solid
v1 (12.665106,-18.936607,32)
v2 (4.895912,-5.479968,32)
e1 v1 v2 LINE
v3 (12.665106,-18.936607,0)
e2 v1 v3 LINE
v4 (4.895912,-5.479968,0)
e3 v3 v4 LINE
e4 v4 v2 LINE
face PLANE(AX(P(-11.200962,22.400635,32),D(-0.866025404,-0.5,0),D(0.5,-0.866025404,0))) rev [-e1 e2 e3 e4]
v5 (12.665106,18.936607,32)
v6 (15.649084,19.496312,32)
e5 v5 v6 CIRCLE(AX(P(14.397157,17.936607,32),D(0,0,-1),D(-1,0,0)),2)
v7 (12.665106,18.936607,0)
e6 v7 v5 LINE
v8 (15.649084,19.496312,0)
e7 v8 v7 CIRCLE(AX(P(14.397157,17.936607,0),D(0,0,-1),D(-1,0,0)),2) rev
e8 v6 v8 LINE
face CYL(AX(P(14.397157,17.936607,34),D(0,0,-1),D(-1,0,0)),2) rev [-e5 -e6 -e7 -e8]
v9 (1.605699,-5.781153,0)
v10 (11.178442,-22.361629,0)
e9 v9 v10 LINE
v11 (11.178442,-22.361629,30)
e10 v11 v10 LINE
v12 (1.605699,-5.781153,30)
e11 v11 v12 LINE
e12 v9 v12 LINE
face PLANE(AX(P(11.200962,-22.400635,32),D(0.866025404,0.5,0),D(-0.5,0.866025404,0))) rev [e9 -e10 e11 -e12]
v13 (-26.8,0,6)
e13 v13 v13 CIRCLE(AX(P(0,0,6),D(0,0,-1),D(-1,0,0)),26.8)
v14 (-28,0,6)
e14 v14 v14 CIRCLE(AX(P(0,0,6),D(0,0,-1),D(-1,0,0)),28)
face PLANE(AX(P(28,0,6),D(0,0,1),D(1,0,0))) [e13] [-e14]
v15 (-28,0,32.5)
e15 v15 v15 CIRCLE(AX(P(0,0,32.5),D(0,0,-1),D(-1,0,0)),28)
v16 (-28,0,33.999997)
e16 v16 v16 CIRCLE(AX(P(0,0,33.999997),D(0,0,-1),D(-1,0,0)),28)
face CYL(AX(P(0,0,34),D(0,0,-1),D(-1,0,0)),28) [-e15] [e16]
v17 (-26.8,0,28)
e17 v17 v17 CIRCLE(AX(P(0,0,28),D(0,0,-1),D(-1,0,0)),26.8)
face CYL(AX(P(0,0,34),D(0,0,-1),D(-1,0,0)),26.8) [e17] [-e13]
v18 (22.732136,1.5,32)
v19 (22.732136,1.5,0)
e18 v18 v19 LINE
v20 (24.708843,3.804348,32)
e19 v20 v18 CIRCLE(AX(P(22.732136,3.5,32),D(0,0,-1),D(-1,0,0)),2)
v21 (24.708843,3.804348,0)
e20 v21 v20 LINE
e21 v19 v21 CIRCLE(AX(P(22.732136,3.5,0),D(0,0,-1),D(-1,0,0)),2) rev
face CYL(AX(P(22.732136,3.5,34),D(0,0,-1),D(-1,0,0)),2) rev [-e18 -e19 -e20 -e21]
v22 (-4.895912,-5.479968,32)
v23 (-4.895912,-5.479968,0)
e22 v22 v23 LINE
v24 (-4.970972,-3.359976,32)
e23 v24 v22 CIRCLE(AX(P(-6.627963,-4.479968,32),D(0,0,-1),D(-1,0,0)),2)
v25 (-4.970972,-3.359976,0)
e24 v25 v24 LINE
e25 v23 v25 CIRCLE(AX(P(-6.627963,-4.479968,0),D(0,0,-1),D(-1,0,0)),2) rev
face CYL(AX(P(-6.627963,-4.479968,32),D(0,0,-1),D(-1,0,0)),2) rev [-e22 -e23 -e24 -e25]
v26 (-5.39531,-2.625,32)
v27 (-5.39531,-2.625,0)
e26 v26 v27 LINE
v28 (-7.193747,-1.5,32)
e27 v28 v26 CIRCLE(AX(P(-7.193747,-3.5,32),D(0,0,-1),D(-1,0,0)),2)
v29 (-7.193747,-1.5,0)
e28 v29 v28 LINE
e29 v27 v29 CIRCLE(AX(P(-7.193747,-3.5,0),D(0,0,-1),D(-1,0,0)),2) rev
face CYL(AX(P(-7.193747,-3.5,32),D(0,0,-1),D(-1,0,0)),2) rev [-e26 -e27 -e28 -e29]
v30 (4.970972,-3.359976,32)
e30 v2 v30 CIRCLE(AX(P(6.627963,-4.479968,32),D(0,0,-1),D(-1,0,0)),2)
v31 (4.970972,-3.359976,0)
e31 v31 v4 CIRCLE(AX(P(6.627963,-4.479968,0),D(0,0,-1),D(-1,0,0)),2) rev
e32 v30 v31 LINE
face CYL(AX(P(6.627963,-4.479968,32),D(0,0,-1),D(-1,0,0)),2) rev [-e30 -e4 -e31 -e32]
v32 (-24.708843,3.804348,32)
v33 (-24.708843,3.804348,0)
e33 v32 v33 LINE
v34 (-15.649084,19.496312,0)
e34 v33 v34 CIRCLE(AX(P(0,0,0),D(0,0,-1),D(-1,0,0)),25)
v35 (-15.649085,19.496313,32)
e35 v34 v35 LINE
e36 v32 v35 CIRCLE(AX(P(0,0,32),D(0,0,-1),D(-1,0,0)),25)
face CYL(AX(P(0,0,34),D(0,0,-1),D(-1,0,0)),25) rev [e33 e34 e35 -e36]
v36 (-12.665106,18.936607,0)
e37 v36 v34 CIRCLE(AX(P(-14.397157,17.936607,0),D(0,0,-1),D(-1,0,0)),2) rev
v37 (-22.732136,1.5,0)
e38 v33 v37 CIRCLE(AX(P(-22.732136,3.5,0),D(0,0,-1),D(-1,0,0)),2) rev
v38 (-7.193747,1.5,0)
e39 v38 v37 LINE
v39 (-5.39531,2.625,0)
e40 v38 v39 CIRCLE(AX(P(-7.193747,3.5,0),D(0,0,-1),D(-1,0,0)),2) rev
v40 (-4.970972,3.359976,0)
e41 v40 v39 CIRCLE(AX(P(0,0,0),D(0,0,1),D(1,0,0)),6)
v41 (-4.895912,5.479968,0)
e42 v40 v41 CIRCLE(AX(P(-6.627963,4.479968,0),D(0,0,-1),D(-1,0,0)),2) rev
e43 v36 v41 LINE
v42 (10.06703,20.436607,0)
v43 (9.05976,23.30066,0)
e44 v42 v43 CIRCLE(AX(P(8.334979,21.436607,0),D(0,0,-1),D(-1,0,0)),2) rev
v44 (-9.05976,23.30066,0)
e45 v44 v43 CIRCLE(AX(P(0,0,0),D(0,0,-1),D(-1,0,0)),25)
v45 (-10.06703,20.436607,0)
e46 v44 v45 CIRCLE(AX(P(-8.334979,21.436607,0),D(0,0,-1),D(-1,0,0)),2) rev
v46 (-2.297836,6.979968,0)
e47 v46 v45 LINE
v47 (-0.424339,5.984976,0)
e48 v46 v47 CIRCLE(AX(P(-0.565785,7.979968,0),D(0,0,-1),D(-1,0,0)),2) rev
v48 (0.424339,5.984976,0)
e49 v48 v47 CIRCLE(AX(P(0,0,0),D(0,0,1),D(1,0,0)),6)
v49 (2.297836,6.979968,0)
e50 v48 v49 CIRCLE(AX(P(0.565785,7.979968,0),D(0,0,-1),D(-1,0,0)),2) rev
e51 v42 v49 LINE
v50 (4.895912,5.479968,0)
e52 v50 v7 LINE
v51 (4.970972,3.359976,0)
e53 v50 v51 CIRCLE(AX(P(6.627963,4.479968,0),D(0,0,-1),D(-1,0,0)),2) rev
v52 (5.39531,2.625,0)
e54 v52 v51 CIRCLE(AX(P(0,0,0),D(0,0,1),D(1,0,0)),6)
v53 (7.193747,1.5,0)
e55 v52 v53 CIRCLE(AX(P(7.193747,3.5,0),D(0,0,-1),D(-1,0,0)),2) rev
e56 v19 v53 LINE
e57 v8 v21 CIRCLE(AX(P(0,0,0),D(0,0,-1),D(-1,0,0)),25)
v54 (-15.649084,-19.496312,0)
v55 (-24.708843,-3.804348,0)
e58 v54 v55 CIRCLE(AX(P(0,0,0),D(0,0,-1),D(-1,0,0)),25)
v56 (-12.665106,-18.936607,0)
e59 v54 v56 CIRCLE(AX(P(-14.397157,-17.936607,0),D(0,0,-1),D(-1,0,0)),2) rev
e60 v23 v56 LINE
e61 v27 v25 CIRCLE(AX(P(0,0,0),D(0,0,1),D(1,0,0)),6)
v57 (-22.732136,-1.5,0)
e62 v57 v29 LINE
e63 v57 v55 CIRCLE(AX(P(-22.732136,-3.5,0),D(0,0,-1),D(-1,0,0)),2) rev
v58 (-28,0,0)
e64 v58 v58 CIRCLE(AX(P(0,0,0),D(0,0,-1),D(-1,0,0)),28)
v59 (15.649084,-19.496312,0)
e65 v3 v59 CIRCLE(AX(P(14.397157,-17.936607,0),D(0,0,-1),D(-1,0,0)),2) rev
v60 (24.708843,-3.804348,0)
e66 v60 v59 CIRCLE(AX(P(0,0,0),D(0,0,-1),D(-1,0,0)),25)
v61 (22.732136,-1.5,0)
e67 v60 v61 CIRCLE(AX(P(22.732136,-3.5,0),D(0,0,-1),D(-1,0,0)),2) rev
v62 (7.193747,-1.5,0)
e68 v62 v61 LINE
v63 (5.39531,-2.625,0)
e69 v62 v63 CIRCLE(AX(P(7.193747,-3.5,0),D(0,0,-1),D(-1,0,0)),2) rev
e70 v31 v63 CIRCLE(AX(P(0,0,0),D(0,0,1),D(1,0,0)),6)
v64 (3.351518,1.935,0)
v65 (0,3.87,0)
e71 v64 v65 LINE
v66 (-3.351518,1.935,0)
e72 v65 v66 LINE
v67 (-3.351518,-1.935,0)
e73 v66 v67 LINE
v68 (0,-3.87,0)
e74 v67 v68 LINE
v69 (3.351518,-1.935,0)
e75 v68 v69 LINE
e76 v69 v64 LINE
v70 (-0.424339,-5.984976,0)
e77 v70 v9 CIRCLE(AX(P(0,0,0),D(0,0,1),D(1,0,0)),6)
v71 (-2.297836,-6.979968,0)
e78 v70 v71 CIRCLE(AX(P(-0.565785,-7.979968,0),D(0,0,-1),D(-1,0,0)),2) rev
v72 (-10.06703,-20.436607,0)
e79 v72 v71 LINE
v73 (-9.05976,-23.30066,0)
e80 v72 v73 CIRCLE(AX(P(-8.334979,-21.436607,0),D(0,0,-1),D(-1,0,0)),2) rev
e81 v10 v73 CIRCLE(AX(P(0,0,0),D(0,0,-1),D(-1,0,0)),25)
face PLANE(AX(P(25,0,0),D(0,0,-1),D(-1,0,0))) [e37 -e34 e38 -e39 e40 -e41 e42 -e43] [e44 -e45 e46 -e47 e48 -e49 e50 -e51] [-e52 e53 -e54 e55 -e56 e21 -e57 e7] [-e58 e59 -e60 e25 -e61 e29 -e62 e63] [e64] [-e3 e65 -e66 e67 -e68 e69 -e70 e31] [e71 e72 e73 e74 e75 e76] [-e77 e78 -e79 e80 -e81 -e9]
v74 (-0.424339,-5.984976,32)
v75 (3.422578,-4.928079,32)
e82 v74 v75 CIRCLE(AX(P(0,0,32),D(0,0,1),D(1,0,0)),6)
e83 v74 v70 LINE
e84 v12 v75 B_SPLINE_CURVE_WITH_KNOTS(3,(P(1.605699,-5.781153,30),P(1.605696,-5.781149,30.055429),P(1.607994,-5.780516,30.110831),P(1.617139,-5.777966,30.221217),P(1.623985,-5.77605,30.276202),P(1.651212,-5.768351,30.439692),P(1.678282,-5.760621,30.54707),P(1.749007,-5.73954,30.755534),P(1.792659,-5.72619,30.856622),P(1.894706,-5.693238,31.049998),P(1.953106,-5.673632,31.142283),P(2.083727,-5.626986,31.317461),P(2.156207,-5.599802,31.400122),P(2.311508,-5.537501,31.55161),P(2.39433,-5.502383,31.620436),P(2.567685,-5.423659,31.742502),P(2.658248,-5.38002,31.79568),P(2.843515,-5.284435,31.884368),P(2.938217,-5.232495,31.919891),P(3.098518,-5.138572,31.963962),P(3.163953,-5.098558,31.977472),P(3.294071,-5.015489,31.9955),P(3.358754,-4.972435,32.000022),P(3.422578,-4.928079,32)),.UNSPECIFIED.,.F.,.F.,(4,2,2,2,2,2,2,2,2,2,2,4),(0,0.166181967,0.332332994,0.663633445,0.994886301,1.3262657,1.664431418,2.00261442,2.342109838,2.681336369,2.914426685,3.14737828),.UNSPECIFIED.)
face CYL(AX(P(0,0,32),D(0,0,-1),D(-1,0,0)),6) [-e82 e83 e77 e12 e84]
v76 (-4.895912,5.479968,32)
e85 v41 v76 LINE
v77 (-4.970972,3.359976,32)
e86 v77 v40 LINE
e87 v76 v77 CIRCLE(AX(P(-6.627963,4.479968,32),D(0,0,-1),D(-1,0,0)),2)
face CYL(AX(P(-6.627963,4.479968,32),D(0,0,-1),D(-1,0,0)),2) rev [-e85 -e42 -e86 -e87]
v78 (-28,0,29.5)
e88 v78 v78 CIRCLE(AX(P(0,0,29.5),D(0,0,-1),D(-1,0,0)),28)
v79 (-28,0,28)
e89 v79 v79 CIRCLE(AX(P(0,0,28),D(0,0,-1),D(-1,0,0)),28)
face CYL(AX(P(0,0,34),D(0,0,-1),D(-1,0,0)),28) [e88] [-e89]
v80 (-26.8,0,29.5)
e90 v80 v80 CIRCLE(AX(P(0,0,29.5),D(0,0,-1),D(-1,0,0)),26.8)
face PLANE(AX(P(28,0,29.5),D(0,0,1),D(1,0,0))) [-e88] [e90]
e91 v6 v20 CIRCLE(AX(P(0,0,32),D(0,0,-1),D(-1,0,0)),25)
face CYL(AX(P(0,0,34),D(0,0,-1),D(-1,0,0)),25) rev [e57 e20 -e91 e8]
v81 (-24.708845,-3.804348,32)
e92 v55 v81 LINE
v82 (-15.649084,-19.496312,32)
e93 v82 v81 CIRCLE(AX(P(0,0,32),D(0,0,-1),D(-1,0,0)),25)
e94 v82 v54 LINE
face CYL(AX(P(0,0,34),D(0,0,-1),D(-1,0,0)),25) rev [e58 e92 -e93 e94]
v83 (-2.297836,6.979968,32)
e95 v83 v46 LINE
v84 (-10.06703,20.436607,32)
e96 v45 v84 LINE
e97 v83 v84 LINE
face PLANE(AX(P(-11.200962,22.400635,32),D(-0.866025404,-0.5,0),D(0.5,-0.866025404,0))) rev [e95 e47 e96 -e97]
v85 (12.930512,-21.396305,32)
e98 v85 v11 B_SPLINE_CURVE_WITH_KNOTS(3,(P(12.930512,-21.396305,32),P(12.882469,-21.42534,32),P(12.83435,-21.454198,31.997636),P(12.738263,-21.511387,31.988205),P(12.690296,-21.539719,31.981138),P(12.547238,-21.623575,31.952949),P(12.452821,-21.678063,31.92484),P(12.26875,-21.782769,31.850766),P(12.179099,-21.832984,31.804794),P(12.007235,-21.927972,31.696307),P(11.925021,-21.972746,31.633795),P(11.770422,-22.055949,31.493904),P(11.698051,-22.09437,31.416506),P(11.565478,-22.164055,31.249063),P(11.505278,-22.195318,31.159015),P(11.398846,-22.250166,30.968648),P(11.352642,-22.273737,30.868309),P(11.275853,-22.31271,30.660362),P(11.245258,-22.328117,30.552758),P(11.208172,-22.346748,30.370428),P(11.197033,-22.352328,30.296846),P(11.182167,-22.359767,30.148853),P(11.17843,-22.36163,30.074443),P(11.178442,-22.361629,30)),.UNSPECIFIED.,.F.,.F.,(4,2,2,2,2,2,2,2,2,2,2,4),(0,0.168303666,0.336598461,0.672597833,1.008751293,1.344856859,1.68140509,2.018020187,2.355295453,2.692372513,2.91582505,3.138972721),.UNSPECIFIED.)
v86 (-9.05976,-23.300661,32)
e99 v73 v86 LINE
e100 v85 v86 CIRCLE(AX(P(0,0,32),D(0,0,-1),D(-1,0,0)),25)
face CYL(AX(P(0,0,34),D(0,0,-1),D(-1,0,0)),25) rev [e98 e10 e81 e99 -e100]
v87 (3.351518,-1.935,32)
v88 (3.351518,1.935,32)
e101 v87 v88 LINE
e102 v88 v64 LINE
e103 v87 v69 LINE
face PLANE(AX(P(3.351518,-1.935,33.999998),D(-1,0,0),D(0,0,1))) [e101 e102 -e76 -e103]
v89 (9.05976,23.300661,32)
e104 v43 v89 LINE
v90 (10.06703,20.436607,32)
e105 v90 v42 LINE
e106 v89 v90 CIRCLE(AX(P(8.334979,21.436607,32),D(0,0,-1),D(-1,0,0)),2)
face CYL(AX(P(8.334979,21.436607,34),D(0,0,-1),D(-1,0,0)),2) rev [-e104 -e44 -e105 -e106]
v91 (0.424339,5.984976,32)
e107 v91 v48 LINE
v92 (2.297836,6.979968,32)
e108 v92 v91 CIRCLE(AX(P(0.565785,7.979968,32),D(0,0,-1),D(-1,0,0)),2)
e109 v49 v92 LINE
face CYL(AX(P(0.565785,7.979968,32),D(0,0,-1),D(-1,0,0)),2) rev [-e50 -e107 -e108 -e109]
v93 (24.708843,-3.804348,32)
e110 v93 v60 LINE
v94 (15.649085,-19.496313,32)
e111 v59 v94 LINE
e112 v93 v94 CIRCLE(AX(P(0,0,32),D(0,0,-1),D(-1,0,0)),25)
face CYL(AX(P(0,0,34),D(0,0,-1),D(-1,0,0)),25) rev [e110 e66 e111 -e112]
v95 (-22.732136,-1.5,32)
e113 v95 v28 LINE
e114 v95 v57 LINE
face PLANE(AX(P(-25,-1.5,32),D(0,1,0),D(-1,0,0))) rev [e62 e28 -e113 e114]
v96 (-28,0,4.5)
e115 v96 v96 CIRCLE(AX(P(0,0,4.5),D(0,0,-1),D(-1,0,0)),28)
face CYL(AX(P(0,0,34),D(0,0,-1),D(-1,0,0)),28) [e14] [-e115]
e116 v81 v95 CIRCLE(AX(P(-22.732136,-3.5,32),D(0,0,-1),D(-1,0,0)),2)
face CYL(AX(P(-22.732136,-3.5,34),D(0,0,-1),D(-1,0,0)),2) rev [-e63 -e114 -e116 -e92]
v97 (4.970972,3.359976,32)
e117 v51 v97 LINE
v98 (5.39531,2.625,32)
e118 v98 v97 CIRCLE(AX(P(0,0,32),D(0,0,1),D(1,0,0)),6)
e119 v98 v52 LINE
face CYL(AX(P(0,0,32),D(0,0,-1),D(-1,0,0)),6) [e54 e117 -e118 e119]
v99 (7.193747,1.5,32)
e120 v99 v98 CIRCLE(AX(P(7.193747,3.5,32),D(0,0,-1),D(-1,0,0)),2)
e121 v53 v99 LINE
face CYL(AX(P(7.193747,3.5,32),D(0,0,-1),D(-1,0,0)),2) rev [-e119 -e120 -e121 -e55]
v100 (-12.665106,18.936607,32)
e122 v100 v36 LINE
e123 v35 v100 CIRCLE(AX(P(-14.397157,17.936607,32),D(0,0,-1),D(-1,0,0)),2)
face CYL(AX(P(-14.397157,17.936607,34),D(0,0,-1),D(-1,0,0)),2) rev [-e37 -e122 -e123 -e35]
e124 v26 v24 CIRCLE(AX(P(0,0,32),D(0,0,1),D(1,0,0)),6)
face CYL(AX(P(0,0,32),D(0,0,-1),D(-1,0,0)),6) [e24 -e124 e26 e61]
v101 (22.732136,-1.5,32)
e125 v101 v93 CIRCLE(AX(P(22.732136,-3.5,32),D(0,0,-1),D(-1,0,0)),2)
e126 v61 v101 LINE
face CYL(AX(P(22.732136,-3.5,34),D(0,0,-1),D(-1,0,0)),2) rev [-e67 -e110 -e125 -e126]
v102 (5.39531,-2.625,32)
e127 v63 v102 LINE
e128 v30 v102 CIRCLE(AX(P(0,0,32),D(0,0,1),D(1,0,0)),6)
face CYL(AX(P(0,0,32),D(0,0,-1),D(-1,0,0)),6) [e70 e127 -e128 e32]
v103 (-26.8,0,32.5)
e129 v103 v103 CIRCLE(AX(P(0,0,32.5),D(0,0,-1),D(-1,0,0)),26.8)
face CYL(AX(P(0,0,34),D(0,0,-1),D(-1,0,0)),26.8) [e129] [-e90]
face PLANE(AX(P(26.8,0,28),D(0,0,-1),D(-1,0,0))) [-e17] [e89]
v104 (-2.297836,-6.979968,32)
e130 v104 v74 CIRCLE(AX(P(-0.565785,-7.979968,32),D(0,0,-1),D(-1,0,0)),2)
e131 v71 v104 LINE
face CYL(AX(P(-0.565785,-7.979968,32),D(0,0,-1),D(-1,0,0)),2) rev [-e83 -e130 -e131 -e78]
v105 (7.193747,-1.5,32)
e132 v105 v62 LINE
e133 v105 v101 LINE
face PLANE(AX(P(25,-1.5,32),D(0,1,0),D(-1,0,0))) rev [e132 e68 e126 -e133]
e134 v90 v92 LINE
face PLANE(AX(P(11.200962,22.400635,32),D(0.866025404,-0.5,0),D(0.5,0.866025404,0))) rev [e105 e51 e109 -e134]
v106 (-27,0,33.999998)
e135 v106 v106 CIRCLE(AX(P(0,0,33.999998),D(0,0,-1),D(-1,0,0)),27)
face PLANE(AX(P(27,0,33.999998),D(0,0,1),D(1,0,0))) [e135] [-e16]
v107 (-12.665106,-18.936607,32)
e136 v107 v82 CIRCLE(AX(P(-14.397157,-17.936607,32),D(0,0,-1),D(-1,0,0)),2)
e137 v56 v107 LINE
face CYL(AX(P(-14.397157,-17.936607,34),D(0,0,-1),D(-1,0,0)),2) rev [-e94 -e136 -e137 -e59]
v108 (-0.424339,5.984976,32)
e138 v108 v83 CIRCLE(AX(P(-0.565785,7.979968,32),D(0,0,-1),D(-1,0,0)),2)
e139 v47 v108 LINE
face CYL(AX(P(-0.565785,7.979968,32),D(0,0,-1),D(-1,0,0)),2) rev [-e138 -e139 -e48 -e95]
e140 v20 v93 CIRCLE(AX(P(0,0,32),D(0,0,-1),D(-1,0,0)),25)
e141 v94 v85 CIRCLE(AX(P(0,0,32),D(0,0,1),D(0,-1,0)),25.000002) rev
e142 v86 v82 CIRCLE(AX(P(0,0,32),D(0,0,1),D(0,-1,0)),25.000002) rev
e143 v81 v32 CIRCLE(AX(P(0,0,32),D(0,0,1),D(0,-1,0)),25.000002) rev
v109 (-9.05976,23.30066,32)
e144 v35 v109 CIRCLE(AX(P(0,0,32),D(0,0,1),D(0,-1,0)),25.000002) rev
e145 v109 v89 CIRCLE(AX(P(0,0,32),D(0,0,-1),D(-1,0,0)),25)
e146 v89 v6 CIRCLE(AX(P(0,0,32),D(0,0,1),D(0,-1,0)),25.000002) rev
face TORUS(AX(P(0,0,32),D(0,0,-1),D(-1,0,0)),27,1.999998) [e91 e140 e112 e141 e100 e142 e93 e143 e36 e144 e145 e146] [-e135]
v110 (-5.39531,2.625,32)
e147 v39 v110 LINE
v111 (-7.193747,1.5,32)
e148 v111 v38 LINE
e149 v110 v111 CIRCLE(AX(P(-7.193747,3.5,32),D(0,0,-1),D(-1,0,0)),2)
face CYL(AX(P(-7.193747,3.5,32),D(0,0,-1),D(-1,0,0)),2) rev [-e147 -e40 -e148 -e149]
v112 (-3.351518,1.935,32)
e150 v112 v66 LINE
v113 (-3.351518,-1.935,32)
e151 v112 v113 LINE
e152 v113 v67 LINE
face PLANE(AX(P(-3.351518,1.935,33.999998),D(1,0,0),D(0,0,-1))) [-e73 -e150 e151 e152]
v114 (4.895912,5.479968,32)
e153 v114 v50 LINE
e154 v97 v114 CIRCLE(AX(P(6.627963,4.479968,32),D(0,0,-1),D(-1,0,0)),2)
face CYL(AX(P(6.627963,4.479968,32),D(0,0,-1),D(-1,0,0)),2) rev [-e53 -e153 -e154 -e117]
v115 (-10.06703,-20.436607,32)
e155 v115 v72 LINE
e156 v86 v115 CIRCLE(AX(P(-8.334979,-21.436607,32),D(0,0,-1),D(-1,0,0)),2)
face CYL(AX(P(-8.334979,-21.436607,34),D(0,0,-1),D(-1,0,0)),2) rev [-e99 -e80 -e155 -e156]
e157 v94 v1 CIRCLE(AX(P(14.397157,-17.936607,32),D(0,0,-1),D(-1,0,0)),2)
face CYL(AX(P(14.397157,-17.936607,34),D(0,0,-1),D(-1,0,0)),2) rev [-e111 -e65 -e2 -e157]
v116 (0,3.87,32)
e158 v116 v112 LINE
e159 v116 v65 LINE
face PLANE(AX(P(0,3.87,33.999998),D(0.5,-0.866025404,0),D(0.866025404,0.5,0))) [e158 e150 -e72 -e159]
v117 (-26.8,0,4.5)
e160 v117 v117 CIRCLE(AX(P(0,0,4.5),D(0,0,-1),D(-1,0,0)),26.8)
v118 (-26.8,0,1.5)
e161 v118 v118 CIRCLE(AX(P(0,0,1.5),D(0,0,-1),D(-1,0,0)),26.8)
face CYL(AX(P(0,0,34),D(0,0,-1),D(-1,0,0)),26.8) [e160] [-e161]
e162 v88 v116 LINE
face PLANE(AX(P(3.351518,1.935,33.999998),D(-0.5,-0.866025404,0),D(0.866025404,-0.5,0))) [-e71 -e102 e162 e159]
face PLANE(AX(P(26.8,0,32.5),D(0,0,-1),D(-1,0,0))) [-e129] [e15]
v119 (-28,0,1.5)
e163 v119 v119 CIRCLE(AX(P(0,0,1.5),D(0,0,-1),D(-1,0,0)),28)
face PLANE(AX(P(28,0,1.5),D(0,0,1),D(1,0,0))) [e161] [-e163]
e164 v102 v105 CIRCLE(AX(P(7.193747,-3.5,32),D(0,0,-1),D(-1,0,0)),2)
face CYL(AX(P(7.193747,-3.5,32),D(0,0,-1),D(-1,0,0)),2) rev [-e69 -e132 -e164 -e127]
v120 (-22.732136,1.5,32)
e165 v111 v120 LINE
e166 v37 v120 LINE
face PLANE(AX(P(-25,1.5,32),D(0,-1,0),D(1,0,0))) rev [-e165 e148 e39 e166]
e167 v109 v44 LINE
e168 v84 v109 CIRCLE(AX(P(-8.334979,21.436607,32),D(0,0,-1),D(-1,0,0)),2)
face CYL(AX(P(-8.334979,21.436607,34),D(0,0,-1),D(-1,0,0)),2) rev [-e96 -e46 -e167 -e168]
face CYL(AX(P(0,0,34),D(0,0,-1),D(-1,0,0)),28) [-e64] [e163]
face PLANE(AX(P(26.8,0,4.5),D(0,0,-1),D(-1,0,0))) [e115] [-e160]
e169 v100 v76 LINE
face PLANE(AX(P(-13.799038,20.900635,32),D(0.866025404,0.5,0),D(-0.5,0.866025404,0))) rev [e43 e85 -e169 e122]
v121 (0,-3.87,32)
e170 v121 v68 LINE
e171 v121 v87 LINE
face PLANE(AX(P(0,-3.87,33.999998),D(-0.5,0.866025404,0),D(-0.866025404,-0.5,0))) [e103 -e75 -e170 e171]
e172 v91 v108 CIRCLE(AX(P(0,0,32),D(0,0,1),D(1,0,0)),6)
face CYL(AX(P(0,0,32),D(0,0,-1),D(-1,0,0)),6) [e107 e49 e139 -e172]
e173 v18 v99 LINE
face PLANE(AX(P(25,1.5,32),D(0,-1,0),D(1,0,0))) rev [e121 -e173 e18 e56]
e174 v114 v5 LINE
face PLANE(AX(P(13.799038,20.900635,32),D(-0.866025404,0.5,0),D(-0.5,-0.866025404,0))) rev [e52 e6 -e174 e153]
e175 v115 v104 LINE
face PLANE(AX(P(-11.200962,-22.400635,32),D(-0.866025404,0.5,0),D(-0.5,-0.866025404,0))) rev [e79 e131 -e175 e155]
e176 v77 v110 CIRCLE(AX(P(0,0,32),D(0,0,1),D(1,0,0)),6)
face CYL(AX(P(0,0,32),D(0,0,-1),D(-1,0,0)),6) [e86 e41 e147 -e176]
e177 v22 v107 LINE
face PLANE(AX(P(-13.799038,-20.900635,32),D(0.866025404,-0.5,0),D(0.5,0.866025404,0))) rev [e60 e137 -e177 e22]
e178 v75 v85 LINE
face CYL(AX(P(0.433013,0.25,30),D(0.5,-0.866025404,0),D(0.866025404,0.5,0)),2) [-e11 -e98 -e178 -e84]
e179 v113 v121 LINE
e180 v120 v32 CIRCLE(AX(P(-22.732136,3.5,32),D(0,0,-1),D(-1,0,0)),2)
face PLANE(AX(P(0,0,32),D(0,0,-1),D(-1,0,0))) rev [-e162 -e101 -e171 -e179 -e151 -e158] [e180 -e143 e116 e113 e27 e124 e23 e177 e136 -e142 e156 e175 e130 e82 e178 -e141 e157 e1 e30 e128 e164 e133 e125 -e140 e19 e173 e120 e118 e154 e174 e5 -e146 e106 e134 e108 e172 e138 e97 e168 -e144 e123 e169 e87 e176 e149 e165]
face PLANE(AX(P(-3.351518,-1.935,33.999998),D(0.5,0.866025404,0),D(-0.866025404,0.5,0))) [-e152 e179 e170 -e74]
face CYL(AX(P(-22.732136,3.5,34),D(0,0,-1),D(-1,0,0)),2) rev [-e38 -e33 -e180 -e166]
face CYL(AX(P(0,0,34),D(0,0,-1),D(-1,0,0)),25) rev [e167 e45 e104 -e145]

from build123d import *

# Parameters (mm, degrees)
SKETCH2_W           = 25
SKETCH2_H           = 3
BOSS_EXTRUDE1_DEPTH = 32
CIRPATTERN1_COUNT   = 6
SKETCH5_R           = 6
BOSS_EXTRUDE2_DEPTH = 32
AXLEHOLE_DEPTH      = 53.191951405
FILLET1_R           = 2


with BuildPart() as part:
    # Sketch1 → Revolve1 (revolve)
    with BuildSketch(Plane.XZ, mode=Mode.PRIVATE) as revolve1_sk:
        with BuildLine():
            Line((25, 0), (28, 0))
            Line((28, 0), (28, 1.5))
            Line((28, 1.5), (26.8, 1.5))
            Line((26.8, 1.5), (26.8, 4.5))
            Line((26.8, 4.5), (28, 4.5))
            Line((28, 4.5), (28, 6))
            Line((28, 6), (26.8, 6))
            Line((26.8, 6), (26.8, 28))
            Line((26.8, 28), (28, 28))
            Line((28, 28), (28, 29.5))
            Line((28, 29.5), (26.8, 29.5))
            Line((26.8, 29.5), (26.8, 32.5))
            Line((26.8, 32.5), (28, 32.5))
            Line((28, 32.5), (28, 33.999996833))
            Line((28, 33.999996833), (27, 33.999996833))
            ThreePointArc((27, 33.999996833), (25.585786438, 33.414213562), (25, 32))
            Line((25, 32), (25, 0))
        make_face()
    revolve(revolve1_sk.sketch.rotate(Axis((0, 0, 34), (0, 0, -1)), 180), axis=Axis((0, 0, 34), (0, 0, -1)))

    # Sketch2 → Boss-Extrude1 (add)
    with BuildSketch(Plane.XY):
        with Locations((12.5, 0)):
            Rectangle(SKETCH2_W, SKETCH2_H)
    boss_extrude1 = extrude(amount=BOSS_EXTRUDE1_DEPTH)

    # CirPattern1: Boss-Extrude1 ×6 about axis
    cirpattern1_axis = Axis((0, 0, 0), (0, 0, 1))
    for i in range(1, CIRPATTERN1_COUNT):
        add(boss_extrude1.rotate(cirpattern1_axis, i * 360 / CIRPATTERN1_COUNT))

    # Sketch5 → Boss-Extrude2 (add)
    with BuildSketch(Plane.XY):
        Circle(SKETCH5_R)
    extrude(amount=BOSS_EXTRUDE2_DEPTH)

    # Sketch6 → AxleHole (cut, through all)
    with BuildSketch(Plane.XY):
        Polygon((0, -3.87), (3.351518313, -1.935), (3.351518313, 1.935), (0, 3.87), (-3.351518313, 1.935), (-3.351518313, -1.935), align=None)
    extrude(amount=AXLEHOLE_DEPTH, mode=Mode.SUBTRACT)

    # Fillet1
    # the kernel refuses this fillet: 2 mm, written as the material it adds along each edge
    with BuildSketch(Plane(origin=(-24.954959427, -1.5, 32), x_dir=(0.10620109039764976, -0.9943446728365121, 0), z_dir=(0, 0, -1))) as fillet1_piece_1:
        with BuildLine():
            CenterArc((2.224755634, -1.997850608), FILLET1_R, 87.343441845, 98.752929077)
            Line((0.236066288, -2.210252789), (0.196292501, -2.214500833))
            Line((0.196292501, -2.214500833), (-0.039773787, -0.004248044))
            Line((-0.039773787, -0.004248044), (-0.001853963, 0.039957012))
            ThreePointArc((-0.001853963, 0.039957012), (1.158726893, 0.066867397), (2.319307748, 0.039957012))
            Line((2.319307748, 0.039957012), (2.317453785, 0))
        make_face()
    extrude(amount=32)
    with BuildSketch(Plane(origin=(-13.776517819, -20.861628814, 32), x_dir=(-0.8080272015953212, 0.589145178612228, 0), z_dir=(0, 0, -1)), Plane(origin=(13.776517819, 20.861628814, 32), x_dir=(0.8080272015953204, -0.589145178612229, 0), z_dir=(0, 0, -1)), Plane(origin=(24.954959427, -1.5, 32), x_dir=(-0.10620109039765001, -0.994344672836512, 0), z_dir=(0, 0, -1)), Plane(origin=(-11.178441608, 22.361628814, 32), x_dir=(0.9142282919929711, 0.4051994942242834, 0), z_dir=(0, 0, -1)), Plane(origin=(-24.954959427, 1.5, 32), x_dir=(0.10620109039765026, 0.994344672836512, 0), z_dir=(0, 0, -1))) as fillet1_piece_2:
        with BuildLine():
            CenterArc((2.224755634, 1.997850608), FILLET1_R, 173.903629078, 98.752929077)
            Line((0.236066288, 2.210252789), (0.196292501, 2.214500833))
            Line((0.196292501, 2.214500833), (-0.039773787, 0.004248044))
            Line((-0.039773787, 0.004248044), (-0.001853963, -0.039957012))
            ThreePointArc((-0.001853963, -0.039957012), (1.158726893, -0.066867397), (2.319307748, -0.039957012))
            Line((2.319307748, -0.039957012), (2.317453785, 0))
        make_face()
    extrude(amount=32)
    with BuildSketch(Plane(origin=(-11.178441608, -22.361628814, 32), x_dir=(0.5000000000000002, 0.8660254037844387, 0), z_dir=(0, 0, -1)), Plane(origin=(13.776517819, -20.861628814, 32), x_dir=(-0.5000000000000002, 0.8660254037844387, 0), z_dir=(0, 0, -1)), Plane(origin=(24.954959427, 1.5, 32), x_dir=(-1, 0, 0), z_dir=(0, 0, -1)), Plane(origin=(11.178441608, 22.361628814, 32), x_dir=(-0.4999999999999994, -0.8660254037844389, 0), z_dir=(0, 0, -1)), Plane(origin=(-13.776517819, 20.861628814, 32), x_dir=(0.5000000000000007, -0.8660254037844382, 0), z_dir=(0, 0, -1))) as fillet1_piece_3:
        with BuildLine():
            CenterArc((2.222823584, 2), FILLET1_R, 171.247070923, 98.752929077)
            Line((0.246116119, 2.304347826), (0.20658197, 2.310434783))
            ThreePointArc((0.20658197, 2.310434783), (0.056568819, 1.159275304), (-0.039927935, 0.0024))
            Line((-0.039927935, 0.0024), (0, -0.04))
            Line((0, -0.04), (2.222823584, -0.04))
            Line((2.222823584, -0.04), (2.222823584, 0))
        make_face()
    extrude(amount=32)
    with BuildSketch(Plane(origin=(5.809475019, 1.5, 32), x_dir=(1, 0, 0), z_dir=(0, 0, -1)), Plane(origin=(4.203775615, -4.281152949, 32), x_dir=(0.5000000000000001, -0.8660254037844386, 0), z_dir=(0, 0, -1)), Plane(origin=(1.605699404, 5.781152949, 32), x_dir=(0.4999999999999986, 0.8660254037844394, 0), z_dir=(0, 0, -1)), Plane(origin=(-4.203775615, 4.281152949, 32), x_dir=(-0.5000000000000004, 0.8660254037844384, 0), z_dir=(0, 0, -1)), Plane(origin=(-5.809475019, -1.5, 32), x_dir=(-1, 0, 0), z_dir=(0, 0, -1)), Plane(origin=(-1.605699404, -5.781152949, 32), x_dir=(-0.4999999999999988, -0.8660254037844393, 0), z_dir=(0, 0, -1))) as fillet1_piece_4:
        with BuildLine():
            CenterArc((1.384272266, -2), FILLET1_R, 90, 64.055520228)
            Line((-0.414164556, -1.125), (-0.450133292, -1.1075))
            ThreePointArc((-0.450133292, -1.1075), (-0.216451666, -0.559050695), (-0.038729833, 0.01))
            Line((-0.038729833, 0.01), (0, 0.04))
            Line((0, 0.04), (1.384272266, 0.04))
            Line((1.384272266, 0.04), (1.384272266, 0))
        make_face()
    extrude(amount=32)
    with BuildSketch(Plane(origin=(4.203775615, 4.281152949, 32), x_dir=(0.6399622417657335, -0.7684063567632539, 0), z_dir=(0, 0, -1)), Plane(origin=(5.809475019, -1.5, 32), x_dir=(-0.3454783045035584, -0.9384267372135913, 0), z_dir=(0, 0, -1)), Plane(origin=(-1.605699404, 5.781152949, 32), x_dir=(0.9854405462692932, 0.1700203804503366, 0), z_dir=(0, 0, -1)), Plane(origin=(-5.809475019, 1.5, 32), x_dir=(0.3454783045035597, 0.9384267372135907, 0), z_dir=(0, 0, -1))) as fillet1_piece_5:
        with BuildLine():
            CenterArc((1.398617439, -1.989994715), FILLET1_R, 95.733483793, 64.055520228)
            Line((-0.478236035, -1.299038106), (-0.515773105, -1.285218973))
            Line((-0.515773105, -1.285218973), (-0.037537069, 0.013819132))
            Line((-0.037537069, 0.013819132), (0.00399605, 0.039799894))
            ThreePointArc((0.00399605, 0.039799894), (0.599407474, 0.009984144), (1.194818898, 0.039799894))
            Line((1.194818898, 0.039799894), (1.198814948, 0))
        make_face()
    extrude(amount=32)
    with BuildSketch(Plane(origin=(-4.203775615, -4.281152949, 32), x_dir=(-0.4999999999999996, -0.8660254037844388, 0), z_dir=(0, 0, -1))) as fillet1_piece_6:
        with BuildLine():
            CenterArc((1.384272266, 2), FILLET1_R, 205.944479772, 64.055520228)
            Line((-0.414164556, 1.125), (-0.450133292, 1.1075))
            ThreePointArc((-0.450133292, 1.1075), (-0.216451666, 0.559050695), (-0.038729833, -0.01))
            Line((-0.038729833, -0.01), (0, -0.04))
            Line((0, -0.04), (1.384272266, -0.04))
            Line((1.384272266, -0.04), (1.384272266, 0))
        make_face()
    extrude(amount=32)
    # the kernel refuses this fillet: 2 mm, written as the material it takes off along each edge
    with BuildSketch(Plane(origin=(-0.894300596, -1.45102593, 32), x_dir=(0.8660254037844385, 0.5000000000000003, 0), z_dir=(0.5000000000000003, -0.8660254037844386, 0))) as fillet1_2_piece_1_section:
        with BuildLine():
            CenterArc((FILLET1_R, -FILLET1_R), FILLET1_R, 90, 90)
            Line((0, -FILLET1_R), (-FILLET1_R * 0.02, -FILLET1_R))
            Line((-FILLET1_R * 0.02, -FILLET1_R), (-FILLET1_R * 0.02, FILLET1_R * 0.02))
            Line((-FILLET1_R * 0.02, FILLET1_R * 0.02), (FILLET1_R, FILLET1_R * 0.02))
            Line((FILLET1_R, FILLET1_R * 0.02), (FILLET1_R, 0))
        make_face()
    fillet1_2_piece_1 = extrude(amount=29.145484408, mode=Mode.PRIVATE)
    fillet1_2_piece_1 = fillet1_2_piece_1 - Plane(origin=(0, 0, 31.546531325), x_dir=(1, 0, 0), z_dir=(0, 0, -1)) * Cylinder(6, 67, mode=Mode.PRIVATE)
    fillet1_2_piece_1 = fillet1_2_piece_1 & Plane(origin=(0, 0, 31.546531325), x_dir=(-1, 0, 0), z_dir=(0, 0, -1)) * Cylinder(25, 67, mode=Mode.PRIVATE)
    add(fillet1_2_piece_1, mode=Mode.SUBTRACT)


solid = part.part
